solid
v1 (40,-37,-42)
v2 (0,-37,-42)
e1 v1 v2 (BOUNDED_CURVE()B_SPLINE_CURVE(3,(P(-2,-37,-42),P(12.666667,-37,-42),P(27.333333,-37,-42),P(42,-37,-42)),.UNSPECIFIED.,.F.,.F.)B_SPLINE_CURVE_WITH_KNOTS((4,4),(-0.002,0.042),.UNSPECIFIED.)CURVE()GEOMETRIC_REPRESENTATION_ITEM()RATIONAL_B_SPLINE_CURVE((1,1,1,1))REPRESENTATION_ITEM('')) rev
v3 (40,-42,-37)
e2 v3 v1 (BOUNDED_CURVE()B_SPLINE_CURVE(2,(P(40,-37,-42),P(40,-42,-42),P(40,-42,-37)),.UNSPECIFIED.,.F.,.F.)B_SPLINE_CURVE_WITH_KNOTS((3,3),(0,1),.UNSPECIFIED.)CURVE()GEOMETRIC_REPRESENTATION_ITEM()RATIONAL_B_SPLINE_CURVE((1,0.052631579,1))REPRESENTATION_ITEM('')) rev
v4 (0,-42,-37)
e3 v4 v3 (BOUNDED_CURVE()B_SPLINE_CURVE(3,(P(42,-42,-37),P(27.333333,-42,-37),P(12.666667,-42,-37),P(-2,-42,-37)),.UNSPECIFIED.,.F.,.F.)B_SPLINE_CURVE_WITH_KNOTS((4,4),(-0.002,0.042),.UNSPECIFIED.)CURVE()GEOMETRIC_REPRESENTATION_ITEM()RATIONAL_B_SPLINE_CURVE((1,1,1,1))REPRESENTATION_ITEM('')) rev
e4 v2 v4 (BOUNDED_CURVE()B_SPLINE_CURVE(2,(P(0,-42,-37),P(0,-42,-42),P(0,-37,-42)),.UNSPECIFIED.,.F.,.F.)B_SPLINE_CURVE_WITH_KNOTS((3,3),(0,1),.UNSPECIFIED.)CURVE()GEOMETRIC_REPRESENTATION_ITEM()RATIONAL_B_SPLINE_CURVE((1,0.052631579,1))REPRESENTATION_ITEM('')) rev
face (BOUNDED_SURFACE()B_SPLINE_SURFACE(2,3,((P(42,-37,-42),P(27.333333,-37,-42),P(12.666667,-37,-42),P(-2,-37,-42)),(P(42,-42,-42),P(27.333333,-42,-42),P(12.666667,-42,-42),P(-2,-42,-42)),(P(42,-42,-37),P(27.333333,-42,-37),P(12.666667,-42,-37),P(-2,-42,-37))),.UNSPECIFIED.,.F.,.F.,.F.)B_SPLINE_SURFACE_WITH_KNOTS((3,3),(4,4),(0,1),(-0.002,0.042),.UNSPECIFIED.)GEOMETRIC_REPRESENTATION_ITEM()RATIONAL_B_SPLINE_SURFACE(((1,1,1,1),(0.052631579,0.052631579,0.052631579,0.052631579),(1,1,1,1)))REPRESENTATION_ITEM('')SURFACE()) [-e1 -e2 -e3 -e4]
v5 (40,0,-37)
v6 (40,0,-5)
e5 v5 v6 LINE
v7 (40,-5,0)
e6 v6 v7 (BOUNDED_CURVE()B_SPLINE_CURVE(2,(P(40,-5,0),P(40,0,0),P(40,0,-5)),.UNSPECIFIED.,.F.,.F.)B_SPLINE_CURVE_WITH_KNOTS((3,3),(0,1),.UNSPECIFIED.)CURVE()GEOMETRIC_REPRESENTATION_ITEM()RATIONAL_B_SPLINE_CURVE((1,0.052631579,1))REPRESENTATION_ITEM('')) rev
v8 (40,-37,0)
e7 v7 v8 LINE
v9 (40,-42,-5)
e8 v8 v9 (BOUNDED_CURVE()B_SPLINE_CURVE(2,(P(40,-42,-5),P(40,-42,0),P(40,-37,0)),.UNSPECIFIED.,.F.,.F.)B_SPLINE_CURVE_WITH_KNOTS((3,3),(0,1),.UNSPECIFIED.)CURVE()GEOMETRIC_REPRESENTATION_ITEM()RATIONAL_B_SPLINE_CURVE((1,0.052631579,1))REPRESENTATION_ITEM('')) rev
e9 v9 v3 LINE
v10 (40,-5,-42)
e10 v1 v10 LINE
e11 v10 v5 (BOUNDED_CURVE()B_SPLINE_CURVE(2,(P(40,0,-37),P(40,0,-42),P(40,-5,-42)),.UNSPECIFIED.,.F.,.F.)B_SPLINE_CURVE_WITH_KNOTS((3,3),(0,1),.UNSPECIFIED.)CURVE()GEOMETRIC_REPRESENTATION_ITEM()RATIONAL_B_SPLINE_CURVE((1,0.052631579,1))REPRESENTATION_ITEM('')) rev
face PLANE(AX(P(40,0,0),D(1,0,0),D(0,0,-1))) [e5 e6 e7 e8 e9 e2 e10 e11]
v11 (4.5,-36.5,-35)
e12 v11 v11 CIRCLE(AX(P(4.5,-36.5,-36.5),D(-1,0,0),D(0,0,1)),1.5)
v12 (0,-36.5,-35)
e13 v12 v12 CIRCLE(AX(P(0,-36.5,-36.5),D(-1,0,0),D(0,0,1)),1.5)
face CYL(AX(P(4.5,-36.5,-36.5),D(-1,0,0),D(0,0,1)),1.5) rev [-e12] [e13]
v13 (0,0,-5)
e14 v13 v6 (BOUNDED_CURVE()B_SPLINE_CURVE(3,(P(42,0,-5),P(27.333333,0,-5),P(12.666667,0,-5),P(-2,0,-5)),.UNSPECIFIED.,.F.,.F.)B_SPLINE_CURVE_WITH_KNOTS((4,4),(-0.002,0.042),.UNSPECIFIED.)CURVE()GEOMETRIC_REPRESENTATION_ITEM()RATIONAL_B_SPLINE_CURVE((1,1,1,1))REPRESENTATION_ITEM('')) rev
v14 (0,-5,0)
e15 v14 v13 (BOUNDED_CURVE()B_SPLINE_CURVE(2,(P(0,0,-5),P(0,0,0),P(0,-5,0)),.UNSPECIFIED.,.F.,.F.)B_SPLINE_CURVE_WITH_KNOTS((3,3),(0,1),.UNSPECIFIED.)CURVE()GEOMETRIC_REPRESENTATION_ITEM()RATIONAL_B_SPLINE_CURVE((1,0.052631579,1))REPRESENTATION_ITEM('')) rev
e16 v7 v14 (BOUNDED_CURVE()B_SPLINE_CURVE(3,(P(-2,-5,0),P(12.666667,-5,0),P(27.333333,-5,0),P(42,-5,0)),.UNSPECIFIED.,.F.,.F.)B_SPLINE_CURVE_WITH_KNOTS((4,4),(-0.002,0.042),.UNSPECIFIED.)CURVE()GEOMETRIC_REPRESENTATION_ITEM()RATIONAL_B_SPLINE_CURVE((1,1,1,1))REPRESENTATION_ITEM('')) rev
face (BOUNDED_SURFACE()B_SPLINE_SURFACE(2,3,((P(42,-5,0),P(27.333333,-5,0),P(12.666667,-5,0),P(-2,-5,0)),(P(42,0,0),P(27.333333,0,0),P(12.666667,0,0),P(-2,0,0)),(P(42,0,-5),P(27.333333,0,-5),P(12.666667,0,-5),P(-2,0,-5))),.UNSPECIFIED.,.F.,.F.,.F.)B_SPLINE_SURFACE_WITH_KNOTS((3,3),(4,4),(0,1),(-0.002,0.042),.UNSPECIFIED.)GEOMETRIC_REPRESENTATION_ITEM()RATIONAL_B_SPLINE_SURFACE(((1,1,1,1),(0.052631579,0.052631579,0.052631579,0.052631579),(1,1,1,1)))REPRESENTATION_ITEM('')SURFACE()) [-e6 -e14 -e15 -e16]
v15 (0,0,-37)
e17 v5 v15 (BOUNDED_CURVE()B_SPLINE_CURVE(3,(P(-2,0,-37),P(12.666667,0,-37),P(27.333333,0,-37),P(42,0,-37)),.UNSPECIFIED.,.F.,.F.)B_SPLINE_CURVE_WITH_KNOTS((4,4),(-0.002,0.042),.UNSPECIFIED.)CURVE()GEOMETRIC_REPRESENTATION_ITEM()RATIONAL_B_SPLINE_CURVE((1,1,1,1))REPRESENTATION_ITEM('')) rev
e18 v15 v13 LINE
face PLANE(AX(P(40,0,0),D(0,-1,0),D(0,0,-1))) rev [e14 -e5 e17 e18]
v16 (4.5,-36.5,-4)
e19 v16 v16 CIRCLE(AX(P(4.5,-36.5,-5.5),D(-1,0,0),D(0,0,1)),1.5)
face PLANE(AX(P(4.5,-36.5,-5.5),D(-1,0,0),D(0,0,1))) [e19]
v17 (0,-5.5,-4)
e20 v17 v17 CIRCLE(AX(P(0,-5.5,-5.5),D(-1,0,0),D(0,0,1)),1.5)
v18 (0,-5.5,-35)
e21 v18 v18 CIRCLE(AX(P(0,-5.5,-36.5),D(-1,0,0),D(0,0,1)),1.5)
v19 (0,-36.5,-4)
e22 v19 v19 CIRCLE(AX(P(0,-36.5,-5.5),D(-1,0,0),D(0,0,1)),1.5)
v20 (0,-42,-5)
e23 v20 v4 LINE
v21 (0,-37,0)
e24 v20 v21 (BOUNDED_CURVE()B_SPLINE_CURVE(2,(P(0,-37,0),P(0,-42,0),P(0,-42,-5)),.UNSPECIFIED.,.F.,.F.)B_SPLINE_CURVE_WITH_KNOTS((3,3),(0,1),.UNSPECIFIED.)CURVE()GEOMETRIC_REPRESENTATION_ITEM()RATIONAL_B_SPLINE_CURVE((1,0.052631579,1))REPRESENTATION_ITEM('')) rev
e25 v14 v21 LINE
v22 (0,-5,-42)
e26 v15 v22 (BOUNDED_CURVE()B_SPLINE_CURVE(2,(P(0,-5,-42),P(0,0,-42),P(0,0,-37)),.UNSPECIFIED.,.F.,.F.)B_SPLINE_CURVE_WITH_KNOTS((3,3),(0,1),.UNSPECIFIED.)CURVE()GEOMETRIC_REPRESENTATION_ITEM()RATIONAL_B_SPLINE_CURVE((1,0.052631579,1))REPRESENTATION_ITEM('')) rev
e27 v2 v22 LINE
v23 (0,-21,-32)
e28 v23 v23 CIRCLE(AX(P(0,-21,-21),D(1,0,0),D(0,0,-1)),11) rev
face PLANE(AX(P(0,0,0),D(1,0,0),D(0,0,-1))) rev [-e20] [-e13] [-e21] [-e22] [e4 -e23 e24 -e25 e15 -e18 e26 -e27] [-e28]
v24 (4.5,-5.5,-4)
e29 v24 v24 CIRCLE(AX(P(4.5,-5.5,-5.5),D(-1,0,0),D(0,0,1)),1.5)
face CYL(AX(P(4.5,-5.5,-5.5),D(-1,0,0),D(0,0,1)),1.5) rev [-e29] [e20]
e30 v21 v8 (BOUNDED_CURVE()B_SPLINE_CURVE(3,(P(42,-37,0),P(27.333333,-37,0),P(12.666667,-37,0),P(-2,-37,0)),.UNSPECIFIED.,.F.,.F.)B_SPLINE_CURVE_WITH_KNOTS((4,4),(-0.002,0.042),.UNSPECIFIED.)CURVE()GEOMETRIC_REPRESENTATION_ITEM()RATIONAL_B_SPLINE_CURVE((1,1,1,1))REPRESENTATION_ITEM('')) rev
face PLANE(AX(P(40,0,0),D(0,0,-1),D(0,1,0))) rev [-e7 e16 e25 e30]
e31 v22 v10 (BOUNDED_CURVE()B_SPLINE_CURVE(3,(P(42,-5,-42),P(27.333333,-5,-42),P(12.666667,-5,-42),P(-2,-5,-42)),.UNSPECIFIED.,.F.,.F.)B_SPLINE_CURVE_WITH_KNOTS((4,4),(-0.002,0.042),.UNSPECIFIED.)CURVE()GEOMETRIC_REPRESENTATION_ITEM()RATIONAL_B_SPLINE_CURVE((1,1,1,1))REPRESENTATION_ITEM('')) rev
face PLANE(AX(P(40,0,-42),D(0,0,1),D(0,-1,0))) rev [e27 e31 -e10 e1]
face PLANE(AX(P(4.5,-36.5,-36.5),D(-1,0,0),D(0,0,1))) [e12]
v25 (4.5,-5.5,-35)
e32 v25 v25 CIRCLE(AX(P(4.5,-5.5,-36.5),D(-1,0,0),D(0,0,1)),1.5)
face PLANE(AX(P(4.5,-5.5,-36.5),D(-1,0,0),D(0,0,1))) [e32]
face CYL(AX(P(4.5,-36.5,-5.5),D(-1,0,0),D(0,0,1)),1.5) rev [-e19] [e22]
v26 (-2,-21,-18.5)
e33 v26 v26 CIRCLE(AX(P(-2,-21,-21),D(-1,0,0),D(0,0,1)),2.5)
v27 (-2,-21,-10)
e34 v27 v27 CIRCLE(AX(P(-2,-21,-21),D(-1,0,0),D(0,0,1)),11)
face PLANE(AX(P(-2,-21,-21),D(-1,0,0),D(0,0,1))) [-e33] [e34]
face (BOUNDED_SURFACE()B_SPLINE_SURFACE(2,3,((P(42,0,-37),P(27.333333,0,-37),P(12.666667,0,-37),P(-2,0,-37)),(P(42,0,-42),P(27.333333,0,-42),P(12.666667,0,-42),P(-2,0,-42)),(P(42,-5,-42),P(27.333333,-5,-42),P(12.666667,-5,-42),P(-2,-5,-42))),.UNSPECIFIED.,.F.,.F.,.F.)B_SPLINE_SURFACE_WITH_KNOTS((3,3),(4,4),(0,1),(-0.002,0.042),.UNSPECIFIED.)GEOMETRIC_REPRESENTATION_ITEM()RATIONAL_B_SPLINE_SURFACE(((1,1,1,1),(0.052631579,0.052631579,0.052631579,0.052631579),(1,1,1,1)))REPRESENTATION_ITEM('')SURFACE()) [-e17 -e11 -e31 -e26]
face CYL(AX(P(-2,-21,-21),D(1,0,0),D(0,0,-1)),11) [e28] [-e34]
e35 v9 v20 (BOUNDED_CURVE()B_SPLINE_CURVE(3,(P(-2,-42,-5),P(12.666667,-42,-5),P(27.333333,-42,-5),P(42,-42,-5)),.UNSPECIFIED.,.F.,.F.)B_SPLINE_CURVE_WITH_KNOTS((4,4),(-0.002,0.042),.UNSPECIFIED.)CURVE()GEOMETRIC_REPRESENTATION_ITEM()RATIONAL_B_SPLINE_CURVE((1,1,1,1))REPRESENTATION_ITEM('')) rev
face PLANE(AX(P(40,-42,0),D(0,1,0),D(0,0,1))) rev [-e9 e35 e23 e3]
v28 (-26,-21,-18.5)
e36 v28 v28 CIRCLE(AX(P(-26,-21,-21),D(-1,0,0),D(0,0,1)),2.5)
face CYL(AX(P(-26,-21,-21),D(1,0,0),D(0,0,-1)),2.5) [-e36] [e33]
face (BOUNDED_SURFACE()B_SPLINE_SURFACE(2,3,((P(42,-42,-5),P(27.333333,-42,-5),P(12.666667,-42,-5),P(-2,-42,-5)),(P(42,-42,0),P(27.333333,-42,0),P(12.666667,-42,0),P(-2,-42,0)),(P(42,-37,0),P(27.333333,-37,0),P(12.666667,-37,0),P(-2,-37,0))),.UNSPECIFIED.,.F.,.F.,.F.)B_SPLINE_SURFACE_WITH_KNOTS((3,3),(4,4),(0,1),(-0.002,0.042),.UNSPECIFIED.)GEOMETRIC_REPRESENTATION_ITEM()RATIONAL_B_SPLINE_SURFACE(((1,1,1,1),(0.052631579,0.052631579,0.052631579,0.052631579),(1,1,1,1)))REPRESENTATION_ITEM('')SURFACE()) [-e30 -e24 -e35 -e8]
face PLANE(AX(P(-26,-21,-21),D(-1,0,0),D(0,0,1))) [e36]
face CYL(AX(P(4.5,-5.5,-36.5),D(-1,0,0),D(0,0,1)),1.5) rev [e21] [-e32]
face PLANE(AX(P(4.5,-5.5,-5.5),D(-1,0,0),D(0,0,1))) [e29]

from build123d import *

# Parameters (mm, degrees)
SKETCH1_W           = 42
SKETCH1_H           = 42
BOSS_EXTRUDE1_DEPTH = 40
SKETCH2_R           = 11
BOSS_EXTRUDE2_DEPTH = 2
SKETCH3_R           = 2.5
BOSS_EXTRUDE3_DEPTH = 24
SKETCH4_R           = 1.5
CUT_EXTRUDE1_DEPTH  = 4.5
FILLET1_SIZE        = 5


with BuildPart() as part:
    # Sketch1 → Boss-Extrude1 (new body)
    with BuildSketch(Plane(origin=(0, 0, 0), x_dir=(0, 0, -1), z_dir=(1, 0, 0))):
        with Locations((21, -21)):
            Rectangle(SKETCH1_W, SKETCH1_H)
    extrude(amount=BOSS_EXTRUDE1_DEPTH)

    # Sketch2 → Boss-Extrude2 (add)
    with BuildSketch(Plane.ZY):
        with Locations(Location((-21, -21, 0), (0, 0, 180))):
            Circle(SKETCH2_R)
    extrude(amount=BOSS_EXTRUDE2_DEPTH)

    # Sketch3 → Boss-Extrude3 (add)
    with BuildSketch(Plane.ZY.offset(2)):
        with Locations((-21, -21)):
            Circle(SKETCH3_R)
    extrude(amount=BOSS_EXTRUDE3_DEPTH)

    # Sketch4 → Cut-Extrude1 (cut)
    with BuildSketch(Plane.ZY):
        with Locations((-36.5, -5.5)):
            Circle(SKETCH4_R)
        with Locations((-5.5, -5.5)):
            Circle(SKETCH4_R)
        with Locations((-5.5, -36.5)):
            Circle(SKETCH4_R)
        with Locations((-36.5, -36.5)):
            Circle(SKETCH4_R)
    extrude(amount=-CUT_EXTRUDE1_DEPTH, mode=Mode.SUBTRACT)

    # Fillet1
    # a fillet whose section is not a circle: 5 mm, written as the material it takes off along each edge
    with BuildSketch(Plane(origin=(-12.5, -42, 0), x_dir=(0, 1, 0), z_dir=(1, 0, 0)), Plane(origin=(-12.5, 0, 0), x_dir=(0, 0, -1), z_dir=(1, 0, 0))) as fillet1_piece_1:
        with BuildLine():
            Bezier((FILLET1_SIZE, 0), (0, 0), (0, -FILLET1_SIZE), weights=[1, 0.052631579, 1])
            Line((0, -FILLET1_SIZE), (0, 0))
            Line((0, 0), (FILLET1_SIZE, 0))
        make_face()
    extrude(amount=65, mode=Mode.SUBTRACT)
    with BuildSketch(Plane(origin=(-12.5, -42, -42), x_dir=(0, 1, 0), z_dir=(1, 0, 0)), Plane(origin=(-12.5, 0, -42), x_dir=(0, 0, 1), z_dir=(1, 0, 0))) as fillet1_piece_2:
        with BuildLine():
            Bezier((FILLET1_SIZE, 0), (0, 0), (0, FILLET1_SIZE), weights=[1, 0.052631579, 1])
            Line((0, FILLET1_SIZE), (0, 0))
            Line((0, 0), (FILLET1_SIZE, 0))
        make_face()
    extrude(amount=65, mode=Mode.SUBTRACT)


solid = part.part
